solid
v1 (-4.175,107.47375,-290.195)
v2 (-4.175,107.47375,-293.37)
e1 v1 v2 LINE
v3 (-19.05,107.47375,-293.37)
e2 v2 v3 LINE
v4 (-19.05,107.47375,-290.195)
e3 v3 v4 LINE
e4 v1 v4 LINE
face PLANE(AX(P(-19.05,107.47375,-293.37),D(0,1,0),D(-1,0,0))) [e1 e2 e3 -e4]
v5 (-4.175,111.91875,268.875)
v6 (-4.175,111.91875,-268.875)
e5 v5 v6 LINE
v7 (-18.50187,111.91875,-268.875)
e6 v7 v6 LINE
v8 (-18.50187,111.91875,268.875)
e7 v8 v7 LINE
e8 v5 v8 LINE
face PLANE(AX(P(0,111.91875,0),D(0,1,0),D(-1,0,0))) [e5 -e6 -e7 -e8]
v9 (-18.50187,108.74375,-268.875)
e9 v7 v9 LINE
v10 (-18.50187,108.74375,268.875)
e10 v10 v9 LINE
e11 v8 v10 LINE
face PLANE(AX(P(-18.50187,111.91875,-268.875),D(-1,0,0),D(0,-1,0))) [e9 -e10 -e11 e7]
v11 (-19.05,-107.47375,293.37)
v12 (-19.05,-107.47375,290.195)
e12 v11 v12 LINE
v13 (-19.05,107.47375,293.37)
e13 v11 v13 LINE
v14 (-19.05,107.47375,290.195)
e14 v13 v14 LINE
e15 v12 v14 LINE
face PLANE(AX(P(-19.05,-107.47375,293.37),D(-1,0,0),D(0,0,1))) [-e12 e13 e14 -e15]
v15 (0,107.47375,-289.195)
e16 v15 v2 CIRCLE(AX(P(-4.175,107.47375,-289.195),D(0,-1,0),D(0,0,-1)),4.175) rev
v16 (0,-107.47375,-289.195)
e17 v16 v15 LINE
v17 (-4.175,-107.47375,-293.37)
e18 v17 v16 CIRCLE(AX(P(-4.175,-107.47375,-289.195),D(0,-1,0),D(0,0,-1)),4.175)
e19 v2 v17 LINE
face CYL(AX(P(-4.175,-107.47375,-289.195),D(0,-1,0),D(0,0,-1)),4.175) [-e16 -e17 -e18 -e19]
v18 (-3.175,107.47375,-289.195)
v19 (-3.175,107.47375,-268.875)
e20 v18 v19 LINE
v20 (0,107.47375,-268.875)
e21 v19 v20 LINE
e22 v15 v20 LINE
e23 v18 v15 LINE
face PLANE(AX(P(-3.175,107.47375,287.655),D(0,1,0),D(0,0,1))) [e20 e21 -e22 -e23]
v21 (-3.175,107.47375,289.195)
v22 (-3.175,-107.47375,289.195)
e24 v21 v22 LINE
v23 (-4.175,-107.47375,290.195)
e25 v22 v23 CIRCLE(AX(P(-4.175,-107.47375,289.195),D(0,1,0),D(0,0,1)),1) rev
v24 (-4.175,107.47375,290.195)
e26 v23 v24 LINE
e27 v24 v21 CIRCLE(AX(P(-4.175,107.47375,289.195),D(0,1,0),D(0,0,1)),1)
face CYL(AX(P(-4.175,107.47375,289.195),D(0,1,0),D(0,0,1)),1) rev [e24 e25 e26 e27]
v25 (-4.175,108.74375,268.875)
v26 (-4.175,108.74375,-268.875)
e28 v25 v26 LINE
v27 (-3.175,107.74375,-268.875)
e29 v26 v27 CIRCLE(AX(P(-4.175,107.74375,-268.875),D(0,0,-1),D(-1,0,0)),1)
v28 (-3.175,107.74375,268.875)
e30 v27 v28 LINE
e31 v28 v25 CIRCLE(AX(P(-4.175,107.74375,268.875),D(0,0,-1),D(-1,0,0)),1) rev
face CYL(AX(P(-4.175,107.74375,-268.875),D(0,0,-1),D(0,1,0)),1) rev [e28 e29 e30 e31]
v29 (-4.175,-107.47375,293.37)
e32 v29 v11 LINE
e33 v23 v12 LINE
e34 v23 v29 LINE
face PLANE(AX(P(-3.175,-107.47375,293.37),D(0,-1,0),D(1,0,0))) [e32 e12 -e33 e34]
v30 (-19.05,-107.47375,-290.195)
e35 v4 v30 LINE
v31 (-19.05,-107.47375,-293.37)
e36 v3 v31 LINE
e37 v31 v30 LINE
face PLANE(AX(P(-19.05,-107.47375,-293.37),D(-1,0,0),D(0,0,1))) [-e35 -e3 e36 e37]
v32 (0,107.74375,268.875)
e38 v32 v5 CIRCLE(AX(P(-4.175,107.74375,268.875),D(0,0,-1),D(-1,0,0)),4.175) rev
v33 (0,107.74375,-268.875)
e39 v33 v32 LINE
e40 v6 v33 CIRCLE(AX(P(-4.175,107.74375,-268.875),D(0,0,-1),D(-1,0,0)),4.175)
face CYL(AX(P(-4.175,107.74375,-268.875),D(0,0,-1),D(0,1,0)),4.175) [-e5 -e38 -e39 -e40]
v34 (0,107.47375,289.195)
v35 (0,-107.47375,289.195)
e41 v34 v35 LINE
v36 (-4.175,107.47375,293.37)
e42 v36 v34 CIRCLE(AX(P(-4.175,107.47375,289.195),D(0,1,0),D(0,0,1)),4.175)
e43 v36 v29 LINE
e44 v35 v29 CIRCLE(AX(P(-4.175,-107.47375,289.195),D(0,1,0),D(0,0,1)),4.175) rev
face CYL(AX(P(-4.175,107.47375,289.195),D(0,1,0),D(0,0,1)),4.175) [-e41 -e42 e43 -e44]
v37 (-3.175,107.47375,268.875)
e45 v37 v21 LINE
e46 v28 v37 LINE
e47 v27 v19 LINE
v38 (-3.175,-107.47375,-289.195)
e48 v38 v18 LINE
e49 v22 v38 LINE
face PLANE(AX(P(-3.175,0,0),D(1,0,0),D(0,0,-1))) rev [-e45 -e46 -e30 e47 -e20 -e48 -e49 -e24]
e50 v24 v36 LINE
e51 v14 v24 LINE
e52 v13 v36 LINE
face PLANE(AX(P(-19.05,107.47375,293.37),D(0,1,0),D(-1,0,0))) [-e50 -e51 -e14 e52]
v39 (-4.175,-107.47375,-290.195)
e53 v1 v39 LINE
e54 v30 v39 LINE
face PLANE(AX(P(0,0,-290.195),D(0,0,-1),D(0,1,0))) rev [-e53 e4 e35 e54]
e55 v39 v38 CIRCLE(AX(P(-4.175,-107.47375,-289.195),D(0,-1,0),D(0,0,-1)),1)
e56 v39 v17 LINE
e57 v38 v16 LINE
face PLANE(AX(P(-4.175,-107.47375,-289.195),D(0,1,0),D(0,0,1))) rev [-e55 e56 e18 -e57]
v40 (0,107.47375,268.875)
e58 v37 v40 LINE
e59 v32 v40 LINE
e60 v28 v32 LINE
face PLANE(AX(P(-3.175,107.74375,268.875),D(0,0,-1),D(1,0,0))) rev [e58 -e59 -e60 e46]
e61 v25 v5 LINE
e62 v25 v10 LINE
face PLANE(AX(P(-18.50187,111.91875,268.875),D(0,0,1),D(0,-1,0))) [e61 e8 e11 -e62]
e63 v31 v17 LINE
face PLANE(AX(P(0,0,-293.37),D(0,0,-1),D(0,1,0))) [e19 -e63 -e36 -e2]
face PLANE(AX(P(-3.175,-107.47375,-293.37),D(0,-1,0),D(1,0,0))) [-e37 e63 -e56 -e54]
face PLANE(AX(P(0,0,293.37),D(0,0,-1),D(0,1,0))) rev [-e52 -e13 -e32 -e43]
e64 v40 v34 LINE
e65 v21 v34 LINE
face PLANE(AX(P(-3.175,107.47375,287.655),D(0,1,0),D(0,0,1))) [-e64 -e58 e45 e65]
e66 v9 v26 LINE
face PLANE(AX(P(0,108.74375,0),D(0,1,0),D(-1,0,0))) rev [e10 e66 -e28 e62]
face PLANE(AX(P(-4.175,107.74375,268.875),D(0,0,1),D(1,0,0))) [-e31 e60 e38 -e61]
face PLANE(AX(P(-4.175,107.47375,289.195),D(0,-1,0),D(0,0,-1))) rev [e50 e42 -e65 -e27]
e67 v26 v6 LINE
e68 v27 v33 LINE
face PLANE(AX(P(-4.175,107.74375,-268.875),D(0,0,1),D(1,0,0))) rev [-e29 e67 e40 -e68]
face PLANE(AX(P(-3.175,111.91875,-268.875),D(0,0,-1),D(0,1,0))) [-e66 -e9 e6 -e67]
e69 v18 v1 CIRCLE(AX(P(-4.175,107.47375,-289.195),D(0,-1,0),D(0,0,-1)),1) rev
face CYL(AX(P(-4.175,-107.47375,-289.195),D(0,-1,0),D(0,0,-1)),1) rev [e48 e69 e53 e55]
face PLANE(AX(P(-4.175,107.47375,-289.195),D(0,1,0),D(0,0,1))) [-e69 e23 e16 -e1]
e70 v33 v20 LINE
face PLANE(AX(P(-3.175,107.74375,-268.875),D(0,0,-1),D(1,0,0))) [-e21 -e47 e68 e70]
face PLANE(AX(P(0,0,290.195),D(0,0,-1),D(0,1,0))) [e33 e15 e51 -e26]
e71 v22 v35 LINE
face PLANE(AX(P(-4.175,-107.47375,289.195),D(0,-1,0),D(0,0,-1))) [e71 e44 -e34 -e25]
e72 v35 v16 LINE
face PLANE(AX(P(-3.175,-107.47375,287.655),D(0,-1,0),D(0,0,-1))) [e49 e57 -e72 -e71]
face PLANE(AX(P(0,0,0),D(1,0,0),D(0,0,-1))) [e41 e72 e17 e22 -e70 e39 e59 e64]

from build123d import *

# Parameters (mm, degrees)
SKETCH1_W               = 575.31
SKETCH1_H               = 214.9475
BASE_FLANGE1_DEPTH      = 3.175
EDGE_FLANGE1_DEPTH      = 214.9475
EDGE_FLANGE1_BEND_DEPTH = 214.9475
EDGE_FLANGE2_DEPTH      = 537.75


# Sheet-metal steps are written as plain solids
with BuildPart() as part:
    # Sketch1 → Base-Flange1 (new body)
    with BuildSketch(Plane(origin=(0, 0, 0), x_dir=(0, 0, -1), z_dir=(1, 0, 0))):
        Rectangle(SKETCH1_W, SKETCH1_H)
    extrude(amount=-BASE_FLANGE1_DEPTH)

    # Edge-Flange1 section (across the edge) → Edge-Flange1 (add)
    with BuildSketch(Plane(origin=(-3.175, 107.47375, -290.195), x_dir=(0, 0, 1), z_dir=(0, -1, 0))):
        with BuildLine():
            Line((-3.175, 1), (-3.175, 15.875))
            Line((-3.175, 15.875), (0, 15.875))
            Line((0, 15.875), (0, 1))
            ThreePointArc((0, 1), (0.292893219, 0.292893219), (1, 0))
            Line((1, 0), (2.54, 0))
            Line((2.54, 0), (2.54, -3.175))
            Line((2.54, -3.175), (1, -3.175))
            ThreePointArc((1, -3.175), (-1.952170811, -1.952170811), (-3.175, 1))
        make_face()
    extrude(amount=EDGE_FLANGE1_DEPTH)

    # Edge-Flange1 section 2 (across the edge) → Edge-Flange1 bend (add)
    with BuildSketch(Plane(origin=(-3.175, -107.47375, 290.195), x_dir=(0, 0, -1), z_dir=(0, 1, 0))):
        with BuildLine():
            Line((-3.175, 1), (-3.175, 15.875))
            Line((-3.175, 15.875), (0, 15.875))
            Line((0, 15.875), (0, 1))
            ThreePointArc((0, 1), (0.292893219, 0.292893219), (1, 0))
            Line((1, 0), (2.54, 0))
            Line((2.54, 0), (2.54, -3.175))
            Line((2.54, -3.175), (1, -3.175))
            ThreePointArc((1, -3.175), (-1.952170811, -1.952170811), (-3.175, 1))
        make_face()
    extrude(amount=EDGE_FLANGE1_BEND_DEPTH)

    # Edge-Flange2 section (across the edge) → Edge-Flange2 (add)
    with BuildSketch(Plane(origin=(-3.175, 108.74375, 268.875), x_dir=(0, -1, 0), z_dir=(0, 0, -1))):
        with BuildLine():
            Line((-3.175, 1), (-3.175, 15.326869713))
            Line((-3.175, 15.326869713), (0, 15.326869713))
            Line((0, 15.326869713), (0, 1))
            ThreePointArc((0, 1), (0.292893219, 0.292893219), (1, 0))
            Line((1, 0), (1.27, 0))
            Line((1.27, 0), (1.27, -3.175))
            Line((1.27, -3.175), (1, -3.175))
            ThreePointArc((1, -3.175), (-1.952170811, -1.952170811), (-3.175, 1))
        make_face()
    extrude(amount=EDGE_FLANGE2_DEPTH)


solid = part.part
